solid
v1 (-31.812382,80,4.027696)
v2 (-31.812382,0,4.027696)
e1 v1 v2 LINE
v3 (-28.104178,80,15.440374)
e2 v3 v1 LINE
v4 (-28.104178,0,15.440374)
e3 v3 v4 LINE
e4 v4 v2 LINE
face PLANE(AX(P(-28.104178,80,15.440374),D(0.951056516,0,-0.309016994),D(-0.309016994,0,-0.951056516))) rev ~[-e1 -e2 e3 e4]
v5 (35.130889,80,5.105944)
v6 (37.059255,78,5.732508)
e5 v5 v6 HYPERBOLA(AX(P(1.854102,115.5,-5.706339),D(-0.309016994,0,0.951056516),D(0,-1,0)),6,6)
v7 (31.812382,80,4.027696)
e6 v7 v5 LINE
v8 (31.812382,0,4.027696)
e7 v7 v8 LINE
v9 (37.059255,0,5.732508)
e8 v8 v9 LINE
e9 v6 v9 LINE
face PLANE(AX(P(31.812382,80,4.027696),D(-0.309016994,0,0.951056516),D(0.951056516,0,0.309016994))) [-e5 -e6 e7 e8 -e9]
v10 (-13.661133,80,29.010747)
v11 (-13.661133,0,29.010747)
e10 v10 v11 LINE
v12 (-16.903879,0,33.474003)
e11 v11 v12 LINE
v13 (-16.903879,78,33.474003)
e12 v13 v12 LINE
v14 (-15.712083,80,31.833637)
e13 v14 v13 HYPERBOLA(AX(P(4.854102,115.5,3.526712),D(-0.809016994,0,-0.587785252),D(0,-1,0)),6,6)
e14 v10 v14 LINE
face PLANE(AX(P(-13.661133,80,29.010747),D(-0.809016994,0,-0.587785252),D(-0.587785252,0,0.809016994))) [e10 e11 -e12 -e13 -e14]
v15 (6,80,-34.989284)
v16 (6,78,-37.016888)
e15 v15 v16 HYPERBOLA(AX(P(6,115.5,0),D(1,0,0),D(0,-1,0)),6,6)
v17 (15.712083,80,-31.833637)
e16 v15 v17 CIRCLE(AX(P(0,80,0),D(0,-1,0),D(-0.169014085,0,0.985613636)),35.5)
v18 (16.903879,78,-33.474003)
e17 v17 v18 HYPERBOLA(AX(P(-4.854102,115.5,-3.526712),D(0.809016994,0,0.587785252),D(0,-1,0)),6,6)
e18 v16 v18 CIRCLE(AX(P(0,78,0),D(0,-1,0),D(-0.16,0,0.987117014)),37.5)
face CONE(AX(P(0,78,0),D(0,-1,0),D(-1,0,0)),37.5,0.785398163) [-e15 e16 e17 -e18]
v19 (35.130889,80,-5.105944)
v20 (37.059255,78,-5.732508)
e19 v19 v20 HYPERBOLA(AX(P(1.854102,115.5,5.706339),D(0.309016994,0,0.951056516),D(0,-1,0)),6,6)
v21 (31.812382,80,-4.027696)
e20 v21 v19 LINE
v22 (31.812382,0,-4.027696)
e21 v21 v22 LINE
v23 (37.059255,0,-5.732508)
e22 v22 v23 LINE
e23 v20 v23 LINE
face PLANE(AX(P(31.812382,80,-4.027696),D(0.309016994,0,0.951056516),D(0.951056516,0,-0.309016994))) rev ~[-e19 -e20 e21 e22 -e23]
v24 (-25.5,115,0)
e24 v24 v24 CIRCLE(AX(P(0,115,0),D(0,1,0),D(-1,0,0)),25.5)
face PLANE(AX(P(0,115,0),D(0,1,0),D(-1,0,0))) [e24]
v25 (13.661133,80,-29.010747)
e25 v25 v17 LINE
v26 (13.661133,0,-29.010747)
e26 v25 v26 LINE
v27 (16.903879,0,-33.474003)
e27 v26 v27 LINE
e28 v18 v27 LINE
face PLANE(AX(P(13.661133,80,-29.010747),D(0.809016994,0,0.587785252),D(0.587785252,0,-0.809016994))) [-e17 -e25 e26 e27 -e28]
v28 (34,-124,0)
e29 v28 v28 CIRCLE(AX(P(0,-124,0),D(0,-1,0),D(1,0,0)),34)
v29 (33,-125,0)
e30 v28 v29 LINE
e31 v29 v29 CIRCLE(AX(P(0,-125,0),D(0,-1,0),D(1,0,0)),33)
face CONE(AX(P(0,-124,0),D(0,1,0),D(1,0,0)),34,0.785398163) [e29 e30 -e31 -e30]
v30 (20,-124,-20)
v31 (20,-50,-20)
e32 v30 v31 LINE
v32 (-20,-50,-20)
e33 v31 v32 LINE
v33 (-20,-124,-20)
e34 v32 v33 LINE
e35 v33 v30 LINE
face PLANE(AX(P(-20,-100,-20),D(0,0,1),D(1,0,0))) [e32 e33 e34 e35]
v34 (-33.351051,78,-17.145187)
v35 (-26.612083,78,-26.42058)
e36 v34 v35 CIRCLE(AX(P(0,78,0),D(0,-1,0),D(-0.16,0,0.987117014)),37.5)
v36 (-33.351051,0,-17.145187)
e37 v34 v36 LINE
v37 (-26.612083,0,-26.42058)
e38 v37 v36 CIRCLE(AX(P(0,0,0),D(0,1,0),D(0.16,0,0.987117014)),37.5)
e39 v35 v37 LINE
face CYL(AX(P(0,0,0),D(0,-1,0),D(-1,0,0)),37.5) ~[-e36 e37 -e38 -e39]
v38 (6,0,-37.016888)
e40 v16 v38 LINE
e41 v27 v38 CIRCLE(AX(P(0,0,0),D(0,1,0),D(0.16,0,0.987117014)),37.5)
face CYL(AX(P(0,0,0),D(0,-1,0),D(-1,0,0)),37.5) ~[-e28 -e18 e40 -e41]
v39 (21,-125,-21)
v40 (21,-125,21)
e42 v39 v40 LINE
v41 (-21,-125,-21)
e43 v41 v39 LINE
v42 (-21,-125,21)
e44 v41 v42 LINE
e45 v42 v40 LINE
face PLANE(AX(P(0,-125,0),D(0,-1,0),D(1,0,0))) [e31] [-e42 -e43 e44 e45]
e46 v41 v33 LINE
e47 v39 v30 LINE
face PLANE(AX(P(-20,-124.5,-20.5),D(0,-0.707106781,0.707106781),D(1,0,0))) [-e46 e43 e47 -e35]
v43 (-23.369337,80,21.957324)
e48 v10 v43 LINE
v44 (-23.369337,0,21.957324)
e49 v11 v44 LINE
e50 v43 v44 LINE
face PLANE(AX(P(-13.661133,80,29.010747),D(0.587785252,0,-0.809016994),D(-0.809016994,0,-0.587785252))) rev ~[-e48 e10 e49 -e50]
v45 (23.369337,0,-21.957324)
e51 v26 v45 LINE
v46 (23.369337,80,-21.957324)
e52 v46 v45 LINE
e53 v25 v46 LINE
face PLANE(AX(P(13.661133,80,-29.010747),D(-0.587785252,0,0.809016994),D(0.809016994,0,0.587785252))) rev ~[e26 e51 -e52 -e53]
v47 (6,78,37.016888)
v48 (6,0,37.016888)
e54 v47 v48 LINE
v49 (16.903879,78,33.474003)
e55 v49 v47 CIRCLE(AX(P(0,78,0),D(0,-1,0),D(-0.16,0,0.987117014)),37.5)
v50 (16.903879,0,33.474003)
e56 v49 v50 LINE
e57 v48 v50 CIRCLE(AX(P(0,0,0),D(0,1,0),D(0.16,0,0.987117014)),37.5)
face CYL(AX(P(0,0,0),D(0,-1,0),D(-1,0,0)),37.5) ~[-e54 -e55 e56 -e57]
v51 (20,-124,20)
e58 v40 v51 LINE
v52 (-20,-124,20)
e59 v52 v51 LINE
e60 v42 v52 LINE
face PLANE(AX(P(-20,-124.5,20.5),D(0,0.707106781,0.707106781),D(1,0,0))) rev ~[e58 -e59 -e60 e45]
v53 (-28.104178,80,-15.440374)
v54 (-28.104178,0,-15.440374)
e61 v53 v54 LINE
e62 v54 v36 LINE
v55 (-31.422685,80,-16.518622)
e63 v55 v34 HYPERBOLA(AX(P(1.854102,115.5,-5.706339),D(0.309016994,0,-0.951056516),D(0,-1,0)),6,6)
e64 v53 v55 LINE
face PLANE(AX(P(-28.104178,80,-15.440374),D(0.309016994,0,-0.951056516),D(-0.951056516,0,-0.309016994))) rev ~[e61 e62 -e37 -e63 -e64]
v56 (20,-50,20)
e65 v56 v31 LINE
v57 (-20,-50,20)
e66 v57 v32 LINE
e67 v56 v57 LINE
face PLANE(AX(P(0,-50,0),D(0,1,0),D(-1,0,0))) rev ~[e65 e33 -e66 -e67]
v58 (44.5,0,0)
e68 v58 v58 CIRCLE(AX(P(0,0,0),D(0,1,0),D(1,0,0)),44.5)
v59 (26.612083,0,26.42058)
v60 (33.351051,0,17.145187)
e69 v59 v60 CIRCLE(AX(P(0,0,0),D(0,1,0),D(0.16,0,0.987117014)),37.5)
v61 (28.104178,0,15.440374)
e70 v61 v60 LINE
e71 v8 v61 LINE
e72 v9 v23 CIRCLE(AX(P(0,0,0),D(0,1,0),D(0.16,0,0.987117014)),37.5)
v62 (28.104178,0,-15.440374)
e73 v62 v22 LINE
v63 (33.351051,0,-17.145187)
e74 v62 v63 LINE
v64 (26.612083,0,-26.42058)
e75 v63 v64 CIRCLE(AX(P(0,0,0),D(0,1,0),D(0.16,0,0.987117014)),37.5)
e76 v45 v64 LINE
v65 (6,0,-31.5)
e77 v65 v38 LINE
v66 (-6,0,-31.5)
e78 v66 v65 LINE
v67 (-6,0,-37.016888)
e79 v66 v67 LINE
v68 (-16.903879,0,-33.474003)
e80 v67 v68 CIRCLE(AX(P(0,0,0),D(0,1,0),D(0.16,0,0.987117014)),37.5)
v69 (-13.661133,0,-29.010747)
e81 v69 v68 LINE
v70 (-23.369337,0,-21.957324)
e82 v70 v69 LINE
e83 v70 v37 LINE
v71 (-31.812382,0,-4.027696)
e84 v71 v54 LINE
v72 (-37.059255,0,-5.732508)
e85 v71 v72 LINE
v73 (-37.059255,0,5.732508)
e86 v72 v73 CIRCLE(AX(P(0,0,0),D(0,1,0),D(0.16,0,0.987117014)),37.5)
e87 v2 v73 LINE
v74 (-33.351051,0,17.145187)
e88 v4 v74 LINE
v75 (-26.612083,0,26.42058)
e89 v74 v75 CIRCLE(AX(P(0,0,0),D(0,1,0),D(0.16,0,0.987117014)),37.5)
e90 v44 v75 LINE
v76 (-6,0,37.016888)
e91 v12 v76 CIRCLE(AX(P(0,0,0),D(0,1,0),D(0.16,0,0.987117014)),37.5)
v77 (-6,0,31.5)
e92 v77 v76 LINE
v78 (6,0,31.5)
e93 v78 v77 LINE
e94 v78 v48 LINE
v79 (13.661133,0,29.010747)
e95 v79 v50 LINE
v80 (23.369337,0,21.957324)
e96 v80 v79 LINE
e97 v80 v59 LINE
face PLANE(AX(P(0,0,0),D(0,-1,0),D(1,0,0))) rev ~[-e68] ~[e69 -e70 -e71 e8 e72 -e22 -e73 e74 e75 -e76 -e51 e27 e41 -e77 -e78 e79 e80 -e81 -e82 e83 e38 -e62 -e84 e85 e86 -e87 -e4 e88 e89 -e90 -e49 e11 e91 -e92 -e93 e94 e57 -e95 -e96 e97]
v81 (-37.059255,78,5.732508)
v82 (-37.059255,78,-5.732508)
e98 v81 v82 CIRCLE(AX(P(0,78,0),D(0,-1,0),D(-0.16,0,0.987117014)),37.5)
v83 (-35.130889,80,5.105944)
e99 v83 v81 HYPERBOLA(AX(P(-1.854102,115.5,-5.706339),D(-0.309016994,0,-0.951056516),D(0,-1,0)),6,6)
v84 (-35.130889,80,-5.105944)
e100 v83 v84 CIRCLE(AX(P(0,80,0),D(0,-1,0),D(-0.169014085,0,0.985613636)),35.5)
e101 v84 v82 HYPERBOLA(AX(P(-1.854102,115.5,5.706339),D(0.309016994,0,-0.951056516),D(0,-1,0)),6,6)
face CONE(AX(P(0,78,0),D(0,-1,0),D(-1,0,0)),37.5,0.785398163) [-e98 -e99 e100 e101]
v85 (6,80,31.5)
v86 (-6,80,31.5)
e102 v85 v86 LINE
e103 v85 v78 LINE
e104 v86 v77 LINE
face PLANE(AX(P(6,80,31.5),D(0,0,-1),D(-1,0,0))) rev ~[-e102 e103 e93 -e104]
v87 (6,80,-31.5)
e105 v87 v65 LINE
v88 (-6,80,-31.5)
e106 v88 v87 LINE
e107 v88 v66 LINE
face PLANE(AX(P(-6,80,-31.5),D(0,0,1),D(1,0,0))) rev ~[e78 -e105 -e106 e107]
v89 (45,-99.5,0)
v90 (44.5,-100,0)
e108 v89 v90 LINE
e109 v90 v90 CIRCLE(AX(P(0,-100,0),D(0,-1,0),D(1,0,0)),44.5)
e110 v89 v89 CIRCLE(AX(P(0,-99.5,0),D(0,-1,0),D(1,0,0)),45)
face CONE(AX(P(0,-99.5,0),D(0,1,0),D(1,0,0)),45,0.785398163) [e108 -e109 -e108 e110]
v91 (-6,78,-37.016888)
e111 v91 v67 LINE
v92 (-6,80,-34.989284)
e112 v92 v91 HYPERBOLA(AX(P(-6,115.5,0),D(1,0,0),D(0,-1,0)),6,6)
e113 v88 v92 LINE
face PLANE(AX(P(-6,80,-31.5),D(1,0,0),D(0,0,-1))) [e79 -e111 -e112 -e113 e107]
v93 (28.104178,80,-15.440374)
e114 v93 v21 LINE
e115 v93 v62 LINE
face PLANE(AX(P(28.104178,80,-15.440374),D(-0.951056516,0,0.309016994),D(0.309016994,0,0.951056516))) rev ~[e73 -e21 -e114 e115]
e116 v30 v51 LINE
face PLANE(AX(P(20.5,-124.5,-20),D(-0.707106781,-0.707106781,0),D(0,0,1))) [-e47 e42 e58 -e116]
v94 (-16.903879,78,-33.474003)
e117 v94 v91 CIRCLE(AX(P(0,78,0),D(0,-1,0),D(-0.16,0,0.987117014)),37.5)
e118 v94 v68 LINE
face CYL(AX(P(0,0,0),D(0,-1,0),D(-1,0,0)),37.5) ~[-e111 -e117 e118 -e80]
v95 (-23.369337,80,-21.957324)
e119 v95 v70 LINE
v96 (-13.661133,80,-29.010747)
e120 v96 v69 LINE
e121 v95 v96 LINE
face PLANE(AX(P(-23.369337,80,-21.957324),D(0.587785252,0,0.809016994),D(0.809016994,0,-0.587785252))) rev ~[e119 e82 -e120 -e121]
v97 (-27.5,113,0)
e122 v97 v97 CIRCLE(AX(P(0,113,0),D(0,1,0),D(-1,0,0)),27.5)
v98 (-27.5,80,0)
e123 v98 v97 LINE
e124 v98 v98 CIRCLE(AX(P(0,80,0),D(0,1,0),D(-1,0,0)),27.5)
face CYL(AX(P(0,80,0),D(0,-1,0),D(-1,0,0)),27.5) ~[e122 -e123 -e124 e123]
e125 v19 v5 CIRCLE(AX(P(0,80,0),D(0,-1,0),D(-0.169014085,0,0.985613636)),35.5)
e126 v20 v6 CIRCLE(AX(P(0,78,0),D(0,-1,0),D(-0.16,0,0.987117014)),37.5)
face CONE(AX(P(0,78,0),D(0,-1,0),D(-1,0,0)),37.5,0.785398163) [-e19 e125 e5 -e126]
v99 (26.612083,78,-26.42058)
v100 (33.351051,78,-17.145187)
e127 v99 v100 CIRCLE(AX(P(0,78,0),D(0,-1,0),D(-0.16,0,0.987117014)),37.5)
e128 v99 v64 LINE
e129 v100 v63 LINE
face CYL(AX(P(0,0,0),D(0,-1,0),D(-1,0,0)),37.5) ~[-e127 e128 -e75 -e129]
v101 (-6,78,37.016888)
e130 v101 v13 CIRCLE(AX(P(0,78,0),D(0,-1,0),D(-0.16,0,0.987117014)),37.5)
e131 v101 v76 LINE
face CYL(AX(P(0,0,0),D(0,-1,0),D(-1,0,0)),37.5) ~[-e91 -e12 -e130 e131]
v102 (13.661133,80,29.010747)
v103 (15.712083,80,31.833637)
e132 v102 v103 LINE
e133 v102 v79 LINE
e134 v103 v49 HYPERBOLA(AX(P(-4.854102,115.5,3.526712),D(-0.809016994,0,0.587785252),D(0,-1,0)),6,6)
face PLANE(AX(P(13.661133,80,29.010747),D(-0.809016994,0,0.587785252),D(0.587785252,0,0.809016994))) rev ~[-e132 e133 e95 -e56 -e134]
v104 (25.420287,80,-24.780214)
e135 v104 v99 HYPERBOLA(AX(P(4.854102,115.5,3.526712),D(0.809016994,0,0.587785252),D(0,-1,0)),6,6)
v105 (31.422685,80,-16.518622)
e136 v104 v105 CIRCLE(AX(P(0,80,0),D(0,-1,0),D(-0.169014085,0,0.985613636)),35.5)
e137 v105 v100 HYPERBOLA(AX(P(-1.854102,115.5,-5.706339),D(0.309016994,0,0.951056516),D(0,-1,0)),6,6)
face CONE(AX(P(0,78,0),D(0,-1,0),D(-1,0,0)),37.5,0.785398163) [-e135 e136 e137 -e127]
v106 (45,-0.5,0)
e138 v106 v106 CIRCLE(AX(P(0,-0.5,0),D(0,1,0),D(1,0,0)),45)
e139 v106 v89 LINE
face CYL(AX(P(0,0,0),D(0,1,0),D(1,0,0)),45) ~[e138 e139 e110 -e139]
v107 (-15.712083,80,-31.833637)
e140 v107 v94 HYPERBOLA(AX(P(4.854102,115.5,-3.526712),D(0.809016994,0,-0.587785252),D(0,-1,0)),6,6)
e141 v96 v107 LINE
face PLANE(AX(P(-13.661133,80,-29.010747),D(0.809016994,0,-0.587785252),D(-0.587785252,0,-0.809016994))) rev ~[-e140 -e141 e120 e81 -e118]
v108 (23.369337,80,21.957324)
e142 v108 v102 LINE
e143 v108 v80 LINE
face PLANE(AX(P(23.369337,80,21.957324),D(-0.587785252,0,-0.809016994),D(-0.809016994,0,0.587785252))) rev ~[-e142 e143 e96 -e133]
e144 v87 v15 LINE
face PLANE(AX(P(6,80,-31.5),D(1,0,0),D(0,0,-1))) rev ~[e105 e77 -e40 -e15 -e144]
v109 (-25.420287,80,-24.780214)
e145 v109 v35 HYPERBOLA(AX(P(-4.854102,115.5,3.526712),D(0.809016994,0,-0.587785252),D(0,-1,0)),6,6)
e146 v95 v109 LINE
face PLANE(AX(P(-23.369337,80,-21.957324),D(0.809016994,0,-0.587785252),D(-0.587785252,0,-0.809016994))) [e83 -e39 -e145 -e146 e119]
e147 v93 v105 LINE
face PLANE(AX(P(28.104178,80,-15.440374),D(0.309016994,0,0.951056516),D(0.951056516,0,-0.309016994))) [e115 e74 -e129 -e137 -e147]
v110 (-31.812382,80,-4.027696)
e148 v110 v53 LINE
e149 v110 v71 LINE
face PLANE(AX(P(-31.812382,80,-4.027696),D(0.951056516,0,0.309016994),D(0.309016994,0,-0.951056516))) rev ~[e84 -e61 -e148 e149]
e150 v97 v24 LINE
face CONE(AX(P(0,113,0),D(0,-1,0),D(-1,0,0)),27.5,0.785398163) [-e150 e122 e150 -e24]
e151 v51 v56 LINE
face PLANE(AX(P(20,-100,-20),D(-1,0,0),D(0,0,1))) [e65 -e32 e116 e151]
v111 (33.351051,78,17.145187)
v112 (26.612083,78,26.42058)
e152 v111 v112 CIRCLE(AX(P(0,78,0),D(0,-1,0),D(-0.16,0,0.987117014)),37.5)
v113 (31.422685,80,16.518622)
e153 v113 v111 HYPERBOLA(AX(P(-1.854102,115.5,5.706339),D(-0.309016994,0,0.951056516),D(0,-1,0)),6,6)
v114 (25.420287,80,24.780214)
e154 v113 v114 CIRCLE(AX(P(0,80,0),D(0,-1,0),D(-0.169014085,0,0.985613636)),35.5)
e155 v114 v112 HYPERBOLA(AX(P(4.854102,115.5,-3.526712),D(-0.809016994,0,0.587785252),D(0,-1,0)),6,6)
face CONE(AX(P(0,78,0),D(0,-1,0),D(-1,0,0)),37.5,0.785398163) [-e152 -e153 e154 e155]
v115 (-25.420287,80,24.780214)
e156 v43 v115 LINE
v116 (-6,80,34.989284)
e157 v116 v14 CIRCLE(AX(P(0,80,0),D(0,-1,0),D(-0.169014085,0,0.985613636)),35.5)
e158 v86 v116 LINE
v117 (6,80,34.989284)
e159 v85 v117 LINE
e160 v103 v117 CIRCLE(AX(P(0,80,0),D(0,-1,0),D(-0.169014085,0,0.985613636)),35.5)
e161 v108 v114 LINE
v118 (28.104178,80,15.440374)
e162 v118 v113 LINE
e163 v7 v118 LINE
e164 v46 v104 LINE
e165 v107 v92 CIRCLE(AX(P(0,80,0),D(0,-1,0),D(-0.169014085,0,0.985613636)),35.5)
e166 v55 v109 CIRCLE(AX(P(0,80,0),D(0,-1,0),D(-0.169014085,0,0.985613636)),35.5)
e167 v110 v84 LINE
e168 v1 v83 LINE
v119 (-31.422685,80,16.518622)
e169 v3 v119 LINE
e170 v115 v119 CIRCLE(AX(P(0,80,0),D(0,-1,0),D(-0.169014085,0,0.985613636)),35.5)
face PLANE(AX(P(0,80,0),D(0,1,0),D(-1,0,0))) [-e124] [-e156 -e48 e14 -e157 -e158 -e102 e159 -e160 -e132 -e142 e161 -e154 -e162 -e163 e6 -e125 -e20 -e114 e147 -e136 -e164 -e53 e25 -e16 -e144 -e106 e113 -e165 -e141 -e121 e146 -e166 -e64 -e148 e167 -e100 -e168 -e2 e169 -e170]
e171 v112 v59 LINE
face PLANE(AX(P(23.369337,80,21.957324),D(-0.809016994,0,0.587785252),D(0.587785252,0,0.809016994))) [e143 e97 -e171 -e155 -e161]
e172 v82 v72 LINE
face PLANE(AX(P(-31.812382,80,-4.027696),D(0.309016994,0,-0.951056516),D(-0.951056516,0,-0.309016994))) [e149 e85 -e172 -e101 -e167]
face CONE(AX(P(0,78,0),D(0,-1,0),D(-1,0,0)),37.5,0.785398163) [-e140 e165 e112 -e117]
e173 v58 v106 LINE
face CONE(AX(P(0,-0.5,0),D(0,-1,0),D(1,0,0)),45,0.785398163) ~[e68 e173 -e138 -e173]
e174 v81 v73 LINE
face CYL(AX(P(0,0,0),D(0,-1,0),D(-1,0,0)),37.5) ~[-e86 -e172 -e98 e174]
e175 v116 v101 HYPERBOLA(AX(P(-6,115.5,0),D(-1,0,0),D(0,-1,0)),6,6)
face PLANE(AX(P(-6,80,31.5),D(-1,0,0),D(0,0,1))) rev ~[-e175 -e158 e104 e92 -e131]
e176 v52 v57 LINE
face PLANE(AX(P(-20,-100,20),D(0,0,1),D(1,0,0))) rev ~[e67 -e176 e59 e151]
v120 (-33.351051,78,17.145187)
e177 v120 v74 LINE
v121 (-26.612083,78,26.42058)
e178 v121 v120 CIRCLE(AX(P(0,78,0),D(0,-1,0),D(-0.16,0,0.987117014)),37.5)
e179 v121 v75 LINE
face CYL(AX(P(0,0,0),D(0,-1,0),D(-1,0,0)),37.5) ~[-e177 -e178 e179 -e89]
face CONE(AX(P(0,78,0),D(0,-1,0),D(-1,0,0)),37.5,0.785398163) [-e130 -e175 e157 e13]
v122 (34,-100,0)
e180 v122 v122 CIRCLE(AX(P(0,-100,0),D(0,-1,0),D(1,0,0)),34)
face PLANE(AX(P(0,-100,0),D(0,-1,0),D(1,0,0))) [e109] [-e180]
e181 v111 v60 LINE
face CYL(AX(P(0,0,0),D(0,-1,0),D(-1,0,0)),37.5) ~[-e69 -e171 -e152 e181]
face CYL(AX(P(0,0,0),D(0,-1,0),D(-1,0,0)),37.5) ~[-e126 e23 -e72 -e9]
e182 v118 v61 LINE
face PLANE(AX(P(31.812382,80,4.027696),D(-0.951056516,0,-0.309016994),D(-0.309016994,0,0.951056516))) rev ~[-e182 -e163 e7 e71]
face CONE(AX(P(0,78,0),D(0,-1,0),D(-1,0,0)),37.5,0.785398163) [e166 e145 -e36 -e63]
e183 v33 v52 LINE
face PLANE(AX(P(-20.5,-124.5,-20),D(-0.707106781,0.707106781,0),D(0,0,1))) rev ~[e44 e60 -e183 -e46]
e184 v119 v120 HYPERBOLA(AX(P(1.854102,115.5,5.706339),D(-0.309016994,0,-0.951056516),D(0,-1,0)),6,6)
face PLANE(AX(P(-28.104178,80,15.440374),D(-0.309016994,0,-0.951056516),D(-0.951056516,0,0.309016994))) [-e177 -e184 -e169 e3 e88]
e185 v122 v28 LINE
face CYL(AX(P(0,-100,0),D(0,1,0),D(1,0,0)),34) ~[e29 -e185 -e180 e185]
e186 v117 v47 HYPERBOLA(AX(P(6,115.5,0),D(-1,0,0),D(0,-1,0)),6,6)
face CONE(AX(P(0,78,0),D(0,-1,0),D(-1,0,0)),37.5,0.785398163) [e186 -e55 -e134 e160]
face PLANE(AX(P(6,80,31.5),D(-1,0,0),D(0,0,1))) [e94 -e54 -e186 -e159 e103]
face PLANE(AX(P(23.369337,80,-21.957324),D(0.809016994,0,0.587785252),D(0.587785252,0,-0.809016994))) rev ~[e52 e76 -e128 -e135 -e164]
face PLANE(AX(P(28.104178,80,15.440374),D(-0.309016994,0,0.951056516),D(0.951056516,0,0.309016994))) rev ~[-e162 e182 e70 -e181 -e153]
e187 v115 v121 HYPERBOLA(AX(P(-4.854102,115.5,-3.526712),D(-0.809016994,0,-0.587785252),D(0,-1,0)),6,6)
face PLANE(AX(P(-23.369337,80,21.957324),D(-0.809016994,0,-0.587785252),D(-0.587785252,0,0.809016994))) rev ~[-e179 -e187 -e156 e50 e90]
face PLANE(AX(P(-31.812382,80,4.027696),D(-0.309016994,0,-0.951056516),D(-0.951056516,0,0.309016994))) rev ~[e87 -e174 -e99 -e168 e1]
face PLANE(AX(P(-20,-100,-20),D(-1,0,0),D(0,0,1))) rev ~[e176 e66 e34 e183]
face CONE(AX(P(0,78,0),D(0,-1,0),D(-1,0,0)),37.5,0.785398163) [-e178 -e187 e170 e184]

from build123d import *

# Parameters (mm, degrees)
F0_R            = 45
F0_W            = 40
F0_H            = 40
F1_DEPTH        = 100
F2_R            = 34
F2_W            = 40
F2_H            = 40
F3_DEPTH        = 25
F4_R            = 37.5
F5_DEPTH        = 80
F5_DEPTH_BACK   = 50
F6_SIZE         = 2
F7_W            = 12
F7_H            = 15
F8_DEPTH        = 80
F8_COPIES_COUNT = 10
F9_SIZE         = 0.5
F10_R           = 27.5
F11_DEPTH       = 35
F12_SIZE        = 2
F13_SIZE        = 1


# Not quite as in the source:
# - a pattern or mirror of a feature is missing from the dataset's text; its kind, count and spacing are read off the source's solid


with BuildPart() as f1:
    # F0 (on Front) → F1 (new body)
    with BuildSketch(Plane.XZ):
        Circle(F0_R)
        Rectangle(F0_W, F0_H, mode=Mode.SUBTRACT)
    extrude(amount=F1_DEPTH)

    # F2 (on face) → F3 (join)
    with BuildSketch(Plane.XZ.offset(100)):
        Circle(F2_R)
        Rectangle(F2_W, F2_H, mode=Mode.SUBTRACT)
    extrude(amount=F3_DEPTH)

    # F4 (on face) → F5 (join, two sides)
    with BuildSketch(Plane(origin=(0, 0, 0), x_dir=(-1, 0, 0), z_dir=(0, 1, 0))) as f5_sk:
        Circle(F4_R)
    extrude(amount=F5_DEPTH)
    extrude(f5_sk.sketch, amount=-F5_DEPTH_BACK)

    # F6
    f6_edges = [f1.edges().sort_by_distance(p)[0] for p in [
        (37.5, 80, 0),
    ]]
    chamfer(f6_edges, length=F6_SIZE)

    # F7 (on face) → F8 (cut, through all)
    with BuildSketch(Plane(origin=(0, 80, 0), x_dir=(-1, 0, 0), z_dir=(0, 1, 0))):
        with Locations((0, 39)):
            Rectangle(F7_W, F7_H)
    f8 = extrude(amount=-F8_DEPTH, mode=Mode.SUBTRACT)

    # F8_copies: F8 ×10 about axis
    f8_copies_axis = Axis((0, 0, 0), (0, 1, 0))
    for i in range(1, F8_COPIES_COUNT):
        add(f8.rotate(f8_copies_axis, i * 360 / F8_COPIES_COUNT), mode=Mode.SUBTRACT)

    # F9
    f9_edges = [f1.edges().sort_by_distance(p)[0] for p in [
        (45, -50, 0),
        (-45, 0, 0),
        (-45, -100, 0),
    ]]
    chamfer(f9_edges, length=F9_SIZE)

    # F10 (on face) → F11 (join)
    with BuildSketch(Plane(origin=(0, 80, 0), x_dir=(-1, 0, 0), z_dir=(0, 1, 0))):
        Circle(F10_R)
    extrude(amount=F11_DEPTH)

    # F12
    f12_edges = [f1.edges().sort_by_distance(p)[0] for p in [
        (27.5, 115, 0),
    ]]
    chamfer(f12_edges, length=F12_SIZE)

    # F13
    f13_edges = [f1.edges().sort_by_distance(p)[0] for p in [
        (-34, -125, 0),
        (0, -125, 20),
        (20, -125, 0),
        (0, -125, -20),
        (-20, -125, 0),
    ]]
    chamfer(f13_edges, length=F13_SIZE)


solid = f1.part
